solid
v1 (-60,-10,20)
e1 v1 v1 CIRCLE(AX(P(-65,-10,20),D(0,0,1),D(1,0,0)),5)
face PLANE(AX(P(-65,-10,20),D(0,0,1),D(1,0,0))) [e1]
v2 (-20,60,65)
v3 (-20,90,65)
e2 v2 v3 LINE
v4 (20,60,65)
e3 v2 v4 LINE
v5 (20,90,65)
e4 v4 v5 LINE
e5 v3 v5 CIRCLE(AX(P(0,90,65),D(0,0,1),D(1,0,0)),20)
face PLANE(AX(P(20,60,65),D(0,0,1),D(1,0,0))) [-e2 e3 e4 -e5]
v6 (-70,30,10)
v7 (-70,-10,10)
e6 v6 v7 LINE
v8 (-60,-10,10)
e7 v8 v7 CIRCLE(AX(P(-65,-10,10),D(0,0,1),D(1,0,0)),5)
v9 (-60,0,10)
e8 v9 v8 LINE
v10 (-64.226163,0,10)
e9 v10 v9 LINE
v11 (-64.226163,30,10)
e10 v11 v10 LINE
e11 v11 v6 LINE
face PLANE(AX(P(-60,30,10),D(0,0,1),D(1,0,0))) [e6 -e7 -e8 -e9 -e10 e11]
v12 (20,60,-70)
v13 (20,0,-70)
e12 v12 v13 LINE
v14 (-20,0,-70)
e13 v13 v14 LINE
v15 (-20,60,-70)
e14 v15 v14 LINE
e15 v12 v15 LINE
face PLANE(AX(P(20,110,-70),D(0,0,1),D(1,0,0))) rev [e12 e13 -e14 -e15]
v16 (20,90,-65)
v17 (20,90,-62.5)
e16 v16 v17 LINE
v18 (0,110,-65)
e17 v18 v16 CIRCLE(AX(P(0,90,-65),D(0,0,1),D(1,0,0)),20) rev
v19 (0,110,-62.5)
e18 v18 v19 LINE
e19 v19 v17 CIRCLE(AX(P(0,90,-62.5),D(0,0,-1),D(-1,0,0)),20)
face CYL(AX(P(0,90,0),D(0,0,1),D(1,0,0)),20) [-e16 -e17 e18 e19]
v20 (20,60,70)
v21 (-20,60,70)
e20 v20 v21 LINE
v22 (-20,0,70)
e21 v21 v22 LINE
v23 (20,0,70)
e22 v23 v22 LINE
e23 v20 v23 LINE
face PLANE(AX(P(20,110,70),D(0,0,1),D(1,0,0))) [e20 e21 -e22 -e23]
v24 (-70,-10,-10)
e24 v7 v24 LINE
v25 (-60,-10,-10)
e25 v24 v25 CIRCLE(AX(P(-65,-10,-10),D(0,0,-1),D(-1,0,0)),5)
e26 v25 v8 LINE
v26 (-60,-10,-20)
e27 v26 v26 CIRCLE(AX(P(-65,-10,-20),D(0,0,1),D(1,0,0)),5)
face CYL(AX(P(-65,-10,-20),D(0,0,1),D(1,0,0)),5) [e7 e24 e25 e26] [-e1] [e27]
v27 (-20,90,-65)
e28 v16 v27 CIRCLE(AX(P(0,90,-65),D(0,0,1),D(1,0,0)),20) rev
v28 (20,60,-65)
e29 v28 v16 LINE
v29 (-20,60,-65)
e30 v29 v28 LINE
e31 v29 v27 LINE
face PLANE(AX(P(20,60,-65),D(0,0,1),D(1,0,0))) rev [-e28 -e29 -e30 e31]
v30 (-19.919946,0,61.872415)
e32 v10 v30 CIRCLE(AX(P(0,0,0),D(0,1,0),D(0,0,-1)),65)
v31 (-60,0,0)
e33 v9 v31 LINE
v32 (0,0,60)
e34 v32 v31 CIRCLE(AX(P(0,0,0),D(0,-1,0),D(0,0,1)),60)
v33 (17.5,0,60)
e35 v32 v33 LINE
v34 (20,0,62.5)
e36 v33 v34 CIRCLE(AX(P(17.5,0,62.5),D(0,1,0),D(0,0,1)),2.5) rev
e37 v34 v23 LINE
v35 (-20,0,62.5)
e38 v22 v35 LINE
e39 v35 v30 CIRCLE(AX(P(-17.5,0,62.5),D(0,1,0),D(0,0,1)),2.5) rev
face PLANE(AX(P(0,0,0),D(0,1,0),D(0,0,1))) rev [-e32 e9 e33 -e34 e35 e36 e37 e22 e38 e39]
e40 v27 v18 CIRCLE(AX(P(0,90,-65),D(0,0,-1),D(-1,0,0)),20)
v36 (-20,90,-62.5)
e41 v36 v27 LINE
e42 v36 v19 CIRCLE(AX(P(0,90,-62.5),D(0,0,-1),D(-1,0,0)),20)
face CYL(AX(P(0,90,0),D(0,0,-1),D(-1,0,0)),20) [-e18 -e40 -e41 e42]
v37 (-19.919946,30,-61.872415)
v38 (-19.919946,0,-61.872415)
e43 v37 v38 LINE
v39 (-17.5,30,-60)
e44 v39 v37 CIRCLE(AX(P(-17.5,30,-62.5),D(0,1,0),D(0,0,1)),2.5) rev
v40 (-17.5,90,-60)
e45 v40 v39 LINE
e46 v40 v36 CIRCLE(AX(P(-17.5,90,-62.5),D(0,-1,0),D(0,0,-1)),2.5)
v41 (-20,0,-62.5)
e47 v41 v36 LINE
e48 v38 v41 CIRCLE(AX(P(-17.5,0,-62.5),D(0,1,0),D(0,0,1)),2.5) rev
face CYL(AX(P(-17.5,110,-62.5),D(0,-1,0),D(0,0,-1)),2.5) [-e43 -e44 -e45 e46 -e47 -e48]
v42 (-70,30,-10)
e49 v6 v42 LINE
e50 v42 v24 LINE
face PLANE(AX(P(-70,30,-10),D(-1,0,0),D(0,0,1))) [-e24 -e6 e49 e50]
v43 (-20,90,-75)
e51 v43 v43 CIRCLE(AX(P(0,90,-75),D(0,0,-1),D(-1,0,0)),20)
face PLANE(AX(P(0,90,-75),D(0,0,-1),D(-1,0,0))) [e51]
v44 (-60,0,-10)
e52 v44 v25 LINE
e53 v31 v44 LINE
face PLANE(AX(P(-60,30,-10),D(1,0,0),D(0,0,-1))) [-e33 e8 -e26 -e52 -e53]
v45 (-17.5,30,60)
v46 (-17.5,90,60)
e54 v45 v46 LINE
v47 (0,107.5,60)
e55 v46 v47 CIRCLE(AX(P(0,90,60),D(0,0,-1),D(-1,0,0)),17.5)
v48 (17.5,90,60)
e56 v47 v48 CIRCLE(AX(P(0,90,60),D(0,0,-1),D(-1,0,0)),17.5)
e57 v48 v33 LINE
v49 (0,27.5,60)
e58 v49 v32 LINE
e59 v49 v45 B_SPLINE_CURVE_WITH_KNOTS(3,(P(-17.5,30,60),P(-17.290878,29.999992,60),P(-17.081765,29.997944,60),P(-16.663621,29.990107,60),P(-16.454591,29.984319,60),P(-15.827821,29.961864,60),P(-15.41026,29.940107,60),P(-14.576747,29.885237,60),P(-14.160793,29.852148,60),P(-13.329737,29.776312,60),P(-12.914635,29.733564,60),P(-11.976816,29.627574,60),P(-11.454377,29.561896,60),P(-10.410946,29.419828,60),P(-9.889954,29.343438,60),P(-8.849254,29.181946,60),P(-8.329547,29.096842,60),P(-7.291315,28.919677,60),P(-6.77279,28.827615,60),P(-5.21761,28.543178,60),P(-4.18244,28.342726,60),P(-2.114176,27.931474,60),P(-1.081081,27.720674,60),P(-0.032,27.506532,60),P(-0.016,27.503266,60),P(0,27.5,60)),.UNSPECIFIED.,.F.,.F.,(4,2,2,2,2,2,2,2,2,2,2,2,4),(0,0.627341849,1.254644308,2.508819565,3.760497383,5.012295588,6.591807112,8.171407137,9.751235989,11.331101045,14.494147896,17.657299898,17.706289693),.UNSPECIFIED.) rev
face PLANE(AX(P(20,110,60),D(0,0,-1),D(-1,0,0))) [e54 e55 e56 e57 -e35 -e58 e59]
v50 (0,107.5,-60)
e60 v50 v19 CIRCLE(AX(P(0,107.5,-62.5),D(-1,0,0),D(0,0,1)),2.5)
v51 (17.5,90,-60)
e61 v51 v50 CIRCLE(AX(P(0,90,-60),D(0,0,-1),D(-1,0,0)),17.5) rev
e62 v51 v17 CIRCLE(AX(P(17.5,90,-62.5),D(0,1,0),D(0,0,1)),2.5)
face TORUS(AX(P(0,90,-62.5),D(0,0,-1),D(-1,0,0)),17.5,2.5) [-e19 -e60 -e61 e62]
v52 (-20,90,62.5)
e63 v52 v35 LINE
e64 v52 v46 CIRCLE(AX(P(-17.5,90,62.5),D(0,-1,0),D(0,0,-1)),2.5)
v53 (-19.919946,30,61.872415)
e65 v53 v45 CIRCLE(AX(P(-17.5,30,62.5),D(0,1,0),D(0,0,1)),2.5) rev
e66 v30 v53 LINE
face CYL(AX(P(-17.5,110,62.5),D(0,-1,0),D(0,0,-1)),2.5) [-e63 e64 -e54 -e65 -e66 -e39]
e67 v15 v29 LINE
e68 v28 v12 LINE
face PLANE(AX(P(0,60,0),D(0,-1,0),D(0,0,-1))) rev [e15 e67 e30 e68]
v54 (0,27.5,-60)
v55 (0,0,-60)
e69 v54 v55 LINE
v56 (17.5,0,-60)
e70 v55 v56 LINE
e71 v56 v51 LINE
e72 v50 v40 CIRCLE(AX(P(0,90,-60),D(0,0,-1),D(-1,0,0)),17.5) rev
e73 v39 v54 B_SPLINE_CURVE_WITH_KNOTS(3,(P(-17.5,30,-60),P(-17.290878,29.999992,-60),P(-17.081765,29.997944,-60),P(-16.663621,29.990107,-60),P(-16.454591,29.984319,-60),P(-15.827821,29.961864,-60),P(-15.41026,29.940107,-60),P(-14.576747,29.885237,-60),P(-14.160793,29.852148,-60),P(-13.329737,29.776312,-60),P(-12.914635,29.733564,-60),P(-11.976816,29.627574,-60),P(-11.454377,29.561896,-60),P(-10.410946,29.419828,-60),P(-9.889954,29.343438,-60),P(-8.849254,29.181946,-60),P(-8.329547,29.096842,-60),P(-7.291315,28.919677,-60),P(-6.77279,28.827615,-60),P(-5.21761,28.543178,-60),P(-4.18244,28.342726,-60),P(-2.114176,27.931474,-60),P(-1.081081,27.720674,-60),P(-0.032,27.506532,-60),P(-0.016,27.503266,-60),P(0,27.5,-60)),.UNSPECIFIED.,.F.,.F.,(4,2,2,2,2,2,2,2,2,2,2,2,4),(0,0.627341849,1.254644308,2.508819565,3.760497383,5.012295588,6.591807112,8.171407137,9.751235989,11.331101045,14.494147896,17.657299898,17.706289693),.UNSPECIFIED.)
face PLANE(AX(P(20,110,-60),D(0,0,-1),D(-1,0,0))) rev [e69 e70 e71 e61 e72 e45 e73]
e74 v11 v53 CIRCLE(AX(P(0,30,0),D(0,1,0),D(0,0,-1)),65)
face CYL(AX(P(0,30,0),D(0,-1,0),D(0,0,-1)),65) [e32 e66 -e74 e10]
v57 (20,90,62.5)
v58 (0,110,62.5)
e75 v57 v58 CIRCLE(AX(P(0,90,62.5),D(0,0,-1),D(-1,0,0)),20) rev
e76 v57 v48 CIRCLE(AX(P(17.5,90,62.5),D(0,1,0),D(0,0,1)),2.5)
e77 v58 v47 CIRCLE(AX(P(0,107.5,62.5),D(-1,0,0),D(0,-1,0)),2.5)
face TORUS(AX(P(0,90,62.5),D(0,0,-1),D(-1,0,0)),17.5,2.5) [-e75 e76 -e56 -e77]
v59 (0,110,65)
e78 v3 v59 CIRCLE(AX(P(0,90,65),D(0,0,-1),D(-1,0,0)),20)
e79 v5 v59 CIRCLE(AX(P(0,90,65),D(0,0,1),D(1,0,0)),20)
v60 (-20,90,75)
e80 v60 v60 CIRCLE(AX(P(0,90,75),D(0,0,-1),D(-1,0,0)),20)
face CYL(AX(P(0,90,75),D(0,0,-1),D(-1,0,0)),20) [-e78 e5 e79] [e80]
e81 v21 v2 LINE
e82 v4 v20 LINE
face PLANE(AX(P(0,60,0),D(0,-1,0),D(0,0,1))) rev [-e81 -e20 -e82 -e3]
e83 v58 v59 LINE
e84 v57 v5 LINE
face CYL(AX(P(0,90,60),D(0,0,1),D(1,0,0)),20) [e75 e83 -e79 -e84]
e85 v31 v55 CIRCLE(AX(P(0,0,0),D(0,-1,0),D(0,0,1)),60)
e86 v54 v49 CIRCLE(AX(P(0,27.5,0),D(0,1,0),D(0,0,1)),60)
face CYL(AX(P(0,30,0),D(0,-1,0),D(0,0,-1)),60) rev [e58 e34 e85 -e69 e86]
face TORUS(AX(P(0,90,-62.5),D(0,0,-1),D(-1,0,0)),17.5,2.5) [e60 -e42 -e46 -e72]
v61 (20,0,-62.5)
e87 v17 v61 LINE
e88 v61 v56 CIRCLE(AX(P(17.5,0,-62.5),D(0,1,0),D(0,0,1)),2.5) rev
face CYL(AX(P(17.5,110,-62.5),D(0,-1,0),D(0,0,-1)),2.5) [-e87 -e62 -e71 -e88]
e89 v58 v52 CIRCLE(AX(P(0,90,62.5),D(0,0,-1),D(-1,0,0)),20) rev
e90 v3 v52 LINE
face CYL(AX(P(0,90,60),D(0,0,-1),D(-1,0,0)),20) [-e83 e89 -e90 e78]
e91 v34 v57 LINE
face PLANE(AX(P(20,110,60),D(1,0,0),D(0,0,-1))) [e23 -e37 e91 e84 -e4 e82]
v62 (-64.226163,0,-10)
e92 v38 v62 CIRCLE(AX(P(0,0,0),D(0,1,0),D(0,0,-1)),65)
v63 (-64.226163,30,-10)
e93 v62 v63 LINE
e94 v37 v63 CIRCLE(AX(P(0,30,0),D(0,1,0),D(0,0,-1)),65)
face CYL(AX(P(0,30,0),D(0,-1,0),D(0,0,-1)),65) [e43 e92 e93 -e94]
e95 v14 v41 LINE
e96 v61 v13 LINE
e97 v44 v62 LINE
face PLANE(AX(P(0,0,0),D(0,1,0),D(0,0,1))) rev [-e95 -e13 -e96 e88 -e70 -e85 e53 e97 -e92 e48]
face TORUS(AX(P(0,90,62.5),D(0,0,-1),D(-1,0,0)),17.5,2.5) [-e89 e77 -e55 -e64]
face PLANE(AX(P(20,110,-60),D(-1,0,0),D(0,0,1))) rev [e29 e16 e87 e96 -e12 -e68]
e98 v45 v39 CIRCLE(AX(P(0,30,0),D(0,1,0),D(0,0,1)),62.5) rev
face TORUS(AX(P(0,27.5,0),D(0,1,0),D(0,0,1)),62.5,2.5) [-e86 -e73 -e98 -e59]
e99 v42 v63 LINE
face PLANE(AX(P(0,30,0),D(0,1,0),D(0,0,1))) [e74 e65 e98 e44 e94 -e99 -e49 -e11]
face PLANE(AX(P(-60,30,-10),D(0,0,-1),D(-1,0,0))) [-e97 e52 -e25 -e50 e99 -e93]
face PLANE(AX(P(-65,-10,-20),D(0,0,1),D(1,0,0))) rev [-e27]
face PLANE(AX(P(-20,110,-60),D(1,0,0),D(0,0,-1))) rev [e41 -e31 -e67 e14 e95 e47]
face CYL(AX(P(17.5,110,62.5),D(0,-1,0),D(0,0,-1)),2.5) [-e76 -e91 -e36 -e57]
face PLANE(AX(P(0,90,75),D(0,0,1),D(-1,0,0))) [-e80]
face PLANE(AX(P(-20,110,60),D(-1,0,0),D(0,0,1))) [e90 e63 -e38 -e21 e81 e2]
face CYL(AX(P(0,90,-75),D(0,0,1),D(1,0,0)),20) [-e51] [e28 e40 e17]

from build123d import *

# Parameters (mm, degrees)
BOSS_EXTRUDE1_DEPTH      = 30
SKETCH2_W                = 40
SKETCH2_H                = 10
BOSS_EXTRUDE2_DEPTH      = 110
SKETCH3_W                = 40
SKETCH3_H                = 5
CUT_EXTRUDE1_DEPTH       = 50
SKETCH4_R                = 20
BOSS_EXTRUDE4_DEPTH      = 10
FILLET1_R                = 20
FILLET1_OF_MIRROR1_R     = 20
BOSS_EXTRUDE5_DEPTH      = 10
BOSS_EXTRUDE5_DEPTH_BACK = 30
SKETCH5_W                = 10
SKETCH5_H                = 20
BOSS_EXTRUDE6_DEPTH      = 20
BOSS_EXTRUDE6_DEPTH_BACK = 20
SKETCH6_R                = 5
FILLET2_R                = 2.5


with BuildPart() as part:
    # Sketch1 → Boss-Extrude1 (new body)
    with BuildSketch(Plane(origin=(0, 0, 0), x_dir=(1, 0, 0), z_dir=(0, 1, 0))):
        with BuildLine():
            Line((0, 65), (0, 60))
            ThreePointArc((0, 60), (-60, 0), (0, -60))
            Line((0, -60), (0, -65))
            ThreePointArc((0, -65), (-65, 0), (0, 65))
        make_face()
    extrude(amount=BOSS_EXTRUDE1_DEPTH)

    # Sketch2 → Boss-Extrude2 (add)
    with BuildSketch(Plane(origin=(0, 0, 0), x_dir=(1, 0, 0), z_dir=(0, 1, 0))):
        with Locations((0, 65)):
            Rectangle(SKETCH2_W, SKETCH2_H)
    boss_extrude2 = extrude(amount=BOSS_EXTRUDE2_DEPTH)

    # Sketch3 → Cut-Extrude1 (cut)
    with BuildSketch(Plane(origin=(0, 110, 0), x_dir=(1, 0, 0), z_dir=(0, 1, 0))):
        with Locations((0, 67.5)):
            Rectangle(SKETCH3_W, SKETCH3_H)
    cut_extrude1 = extrude(amount=-CUT_EXTRUDE1_DEPTH, mode=Mode.SUBTRACT)

    # Sketch4 → Boss-Extrude4 (add)
    with BuildSketch(Plane(origin=(0, 0, -65), x_dir=(-1, 0, 0), z_dir=(0, 0, -1))):
        with Locations((0, 90)):
            Circle(SKETCH4_R)
    boss_extrude4 = extrude(amount=BOSS_EXTRUDE4_DEPTH)

    # Fillet1
    fillet1_edges = [part.edges().sort_by_distance(p)[0] for p in [
        (20, 110, -62.5),
        (-20, 110, -62.5),
    ]]
    fillet(fillet1_edges, radius=FILLET1_R - 0.0001)  # a hair under: the kernel refuses the full size

    # Mirror1: Boss-Extrude2, Cut-Extrude1, Boss-Extrude4 across plane
    add(boss_extrude2.mirror(Plane.XY))
    add(cut_extrude1.mirror(Plane.XY), mode=Mode.SUBTRACT)
    add(boss_extrude4.mirror(Plane.XY))

    # Fillet1 of Mirror1
    fillet1_of_mirror1_edges = [part.edges().sort_by_distance(p)[0] for p in [
        (20, 110, 62.5),
        (-20, 110, 62.5),
    ]]
    fillet(fillet1_of_mirror1_edges, radius=FILLET1_OF_MIRROR1_R - 0.0001)  # a hair under: the kernel refuses the full size

    # Sketch5 → Boss-Extrude5 (add, two sides: drawn at the far end of the back side and taken through both)
    with BuildSketch(Plane.XZ.offset(-BOSS_EXTRUDE5_DEPTH_BACK)):
        with Locations((-65, 0)):
            Rectangle(SKETCH5_W, SKETCH5_H)
    extrude(amount=BOSS_EXTRUDE5_DEPTH + BOSS_EXTRUDE5_DEPTH_BACK)

    # Sketch6 → Boss-Extrude6 (add, two sides: drawn at the far end of the back side and taken through both)
    with BuildSketch(Plane.XY.offset(-BOSS_EXTRUDE6_DEPTH_BACK)):
        with Locations((-65, -10)):
            Circle(SKETCH6_R)
    extrude(amount=BOSS_EXTRUDE6_DEPTH + BOSS_EXTRUDE6_DEPTH_BACK)

    # Fillet2
    fillet2_edges = [part.edges().sort_by_distance(p)[0] for p in [
        (-20, 60.00005, 60),
        (20, 45.00005, 60),
        (0, 110, 60),
        (14.142164913, 104.142164913, 60),
        (-14.142164913, 104.142164913, 60),
    ]]
    fillet(fillet2_edges, radius=FILLET2_R)
    fillet2_2_edges = [part.edges().sort_by_distance(p)[0] for p in [
        (-60, 30, 0),
    ]]
    fillet(fillet2_2_edges, radius=FILLET2_R - 0.0001)  # a hair under: the kernel refuses the full size
    fillet2_3_edges = [part.edges().sort_by_distance(p)[0] for p in [
        (-20, 60.00005, -60),
        (-14.142164913, 104.142164913, -60),
        (0, 110, -60),
        (14.142164913, 104.142164913, -60),
        (20, 45.00005, -60),
    ]]
    fillet(fillet2_3_edges, radius=FILLET2_R)


solid = part.part
